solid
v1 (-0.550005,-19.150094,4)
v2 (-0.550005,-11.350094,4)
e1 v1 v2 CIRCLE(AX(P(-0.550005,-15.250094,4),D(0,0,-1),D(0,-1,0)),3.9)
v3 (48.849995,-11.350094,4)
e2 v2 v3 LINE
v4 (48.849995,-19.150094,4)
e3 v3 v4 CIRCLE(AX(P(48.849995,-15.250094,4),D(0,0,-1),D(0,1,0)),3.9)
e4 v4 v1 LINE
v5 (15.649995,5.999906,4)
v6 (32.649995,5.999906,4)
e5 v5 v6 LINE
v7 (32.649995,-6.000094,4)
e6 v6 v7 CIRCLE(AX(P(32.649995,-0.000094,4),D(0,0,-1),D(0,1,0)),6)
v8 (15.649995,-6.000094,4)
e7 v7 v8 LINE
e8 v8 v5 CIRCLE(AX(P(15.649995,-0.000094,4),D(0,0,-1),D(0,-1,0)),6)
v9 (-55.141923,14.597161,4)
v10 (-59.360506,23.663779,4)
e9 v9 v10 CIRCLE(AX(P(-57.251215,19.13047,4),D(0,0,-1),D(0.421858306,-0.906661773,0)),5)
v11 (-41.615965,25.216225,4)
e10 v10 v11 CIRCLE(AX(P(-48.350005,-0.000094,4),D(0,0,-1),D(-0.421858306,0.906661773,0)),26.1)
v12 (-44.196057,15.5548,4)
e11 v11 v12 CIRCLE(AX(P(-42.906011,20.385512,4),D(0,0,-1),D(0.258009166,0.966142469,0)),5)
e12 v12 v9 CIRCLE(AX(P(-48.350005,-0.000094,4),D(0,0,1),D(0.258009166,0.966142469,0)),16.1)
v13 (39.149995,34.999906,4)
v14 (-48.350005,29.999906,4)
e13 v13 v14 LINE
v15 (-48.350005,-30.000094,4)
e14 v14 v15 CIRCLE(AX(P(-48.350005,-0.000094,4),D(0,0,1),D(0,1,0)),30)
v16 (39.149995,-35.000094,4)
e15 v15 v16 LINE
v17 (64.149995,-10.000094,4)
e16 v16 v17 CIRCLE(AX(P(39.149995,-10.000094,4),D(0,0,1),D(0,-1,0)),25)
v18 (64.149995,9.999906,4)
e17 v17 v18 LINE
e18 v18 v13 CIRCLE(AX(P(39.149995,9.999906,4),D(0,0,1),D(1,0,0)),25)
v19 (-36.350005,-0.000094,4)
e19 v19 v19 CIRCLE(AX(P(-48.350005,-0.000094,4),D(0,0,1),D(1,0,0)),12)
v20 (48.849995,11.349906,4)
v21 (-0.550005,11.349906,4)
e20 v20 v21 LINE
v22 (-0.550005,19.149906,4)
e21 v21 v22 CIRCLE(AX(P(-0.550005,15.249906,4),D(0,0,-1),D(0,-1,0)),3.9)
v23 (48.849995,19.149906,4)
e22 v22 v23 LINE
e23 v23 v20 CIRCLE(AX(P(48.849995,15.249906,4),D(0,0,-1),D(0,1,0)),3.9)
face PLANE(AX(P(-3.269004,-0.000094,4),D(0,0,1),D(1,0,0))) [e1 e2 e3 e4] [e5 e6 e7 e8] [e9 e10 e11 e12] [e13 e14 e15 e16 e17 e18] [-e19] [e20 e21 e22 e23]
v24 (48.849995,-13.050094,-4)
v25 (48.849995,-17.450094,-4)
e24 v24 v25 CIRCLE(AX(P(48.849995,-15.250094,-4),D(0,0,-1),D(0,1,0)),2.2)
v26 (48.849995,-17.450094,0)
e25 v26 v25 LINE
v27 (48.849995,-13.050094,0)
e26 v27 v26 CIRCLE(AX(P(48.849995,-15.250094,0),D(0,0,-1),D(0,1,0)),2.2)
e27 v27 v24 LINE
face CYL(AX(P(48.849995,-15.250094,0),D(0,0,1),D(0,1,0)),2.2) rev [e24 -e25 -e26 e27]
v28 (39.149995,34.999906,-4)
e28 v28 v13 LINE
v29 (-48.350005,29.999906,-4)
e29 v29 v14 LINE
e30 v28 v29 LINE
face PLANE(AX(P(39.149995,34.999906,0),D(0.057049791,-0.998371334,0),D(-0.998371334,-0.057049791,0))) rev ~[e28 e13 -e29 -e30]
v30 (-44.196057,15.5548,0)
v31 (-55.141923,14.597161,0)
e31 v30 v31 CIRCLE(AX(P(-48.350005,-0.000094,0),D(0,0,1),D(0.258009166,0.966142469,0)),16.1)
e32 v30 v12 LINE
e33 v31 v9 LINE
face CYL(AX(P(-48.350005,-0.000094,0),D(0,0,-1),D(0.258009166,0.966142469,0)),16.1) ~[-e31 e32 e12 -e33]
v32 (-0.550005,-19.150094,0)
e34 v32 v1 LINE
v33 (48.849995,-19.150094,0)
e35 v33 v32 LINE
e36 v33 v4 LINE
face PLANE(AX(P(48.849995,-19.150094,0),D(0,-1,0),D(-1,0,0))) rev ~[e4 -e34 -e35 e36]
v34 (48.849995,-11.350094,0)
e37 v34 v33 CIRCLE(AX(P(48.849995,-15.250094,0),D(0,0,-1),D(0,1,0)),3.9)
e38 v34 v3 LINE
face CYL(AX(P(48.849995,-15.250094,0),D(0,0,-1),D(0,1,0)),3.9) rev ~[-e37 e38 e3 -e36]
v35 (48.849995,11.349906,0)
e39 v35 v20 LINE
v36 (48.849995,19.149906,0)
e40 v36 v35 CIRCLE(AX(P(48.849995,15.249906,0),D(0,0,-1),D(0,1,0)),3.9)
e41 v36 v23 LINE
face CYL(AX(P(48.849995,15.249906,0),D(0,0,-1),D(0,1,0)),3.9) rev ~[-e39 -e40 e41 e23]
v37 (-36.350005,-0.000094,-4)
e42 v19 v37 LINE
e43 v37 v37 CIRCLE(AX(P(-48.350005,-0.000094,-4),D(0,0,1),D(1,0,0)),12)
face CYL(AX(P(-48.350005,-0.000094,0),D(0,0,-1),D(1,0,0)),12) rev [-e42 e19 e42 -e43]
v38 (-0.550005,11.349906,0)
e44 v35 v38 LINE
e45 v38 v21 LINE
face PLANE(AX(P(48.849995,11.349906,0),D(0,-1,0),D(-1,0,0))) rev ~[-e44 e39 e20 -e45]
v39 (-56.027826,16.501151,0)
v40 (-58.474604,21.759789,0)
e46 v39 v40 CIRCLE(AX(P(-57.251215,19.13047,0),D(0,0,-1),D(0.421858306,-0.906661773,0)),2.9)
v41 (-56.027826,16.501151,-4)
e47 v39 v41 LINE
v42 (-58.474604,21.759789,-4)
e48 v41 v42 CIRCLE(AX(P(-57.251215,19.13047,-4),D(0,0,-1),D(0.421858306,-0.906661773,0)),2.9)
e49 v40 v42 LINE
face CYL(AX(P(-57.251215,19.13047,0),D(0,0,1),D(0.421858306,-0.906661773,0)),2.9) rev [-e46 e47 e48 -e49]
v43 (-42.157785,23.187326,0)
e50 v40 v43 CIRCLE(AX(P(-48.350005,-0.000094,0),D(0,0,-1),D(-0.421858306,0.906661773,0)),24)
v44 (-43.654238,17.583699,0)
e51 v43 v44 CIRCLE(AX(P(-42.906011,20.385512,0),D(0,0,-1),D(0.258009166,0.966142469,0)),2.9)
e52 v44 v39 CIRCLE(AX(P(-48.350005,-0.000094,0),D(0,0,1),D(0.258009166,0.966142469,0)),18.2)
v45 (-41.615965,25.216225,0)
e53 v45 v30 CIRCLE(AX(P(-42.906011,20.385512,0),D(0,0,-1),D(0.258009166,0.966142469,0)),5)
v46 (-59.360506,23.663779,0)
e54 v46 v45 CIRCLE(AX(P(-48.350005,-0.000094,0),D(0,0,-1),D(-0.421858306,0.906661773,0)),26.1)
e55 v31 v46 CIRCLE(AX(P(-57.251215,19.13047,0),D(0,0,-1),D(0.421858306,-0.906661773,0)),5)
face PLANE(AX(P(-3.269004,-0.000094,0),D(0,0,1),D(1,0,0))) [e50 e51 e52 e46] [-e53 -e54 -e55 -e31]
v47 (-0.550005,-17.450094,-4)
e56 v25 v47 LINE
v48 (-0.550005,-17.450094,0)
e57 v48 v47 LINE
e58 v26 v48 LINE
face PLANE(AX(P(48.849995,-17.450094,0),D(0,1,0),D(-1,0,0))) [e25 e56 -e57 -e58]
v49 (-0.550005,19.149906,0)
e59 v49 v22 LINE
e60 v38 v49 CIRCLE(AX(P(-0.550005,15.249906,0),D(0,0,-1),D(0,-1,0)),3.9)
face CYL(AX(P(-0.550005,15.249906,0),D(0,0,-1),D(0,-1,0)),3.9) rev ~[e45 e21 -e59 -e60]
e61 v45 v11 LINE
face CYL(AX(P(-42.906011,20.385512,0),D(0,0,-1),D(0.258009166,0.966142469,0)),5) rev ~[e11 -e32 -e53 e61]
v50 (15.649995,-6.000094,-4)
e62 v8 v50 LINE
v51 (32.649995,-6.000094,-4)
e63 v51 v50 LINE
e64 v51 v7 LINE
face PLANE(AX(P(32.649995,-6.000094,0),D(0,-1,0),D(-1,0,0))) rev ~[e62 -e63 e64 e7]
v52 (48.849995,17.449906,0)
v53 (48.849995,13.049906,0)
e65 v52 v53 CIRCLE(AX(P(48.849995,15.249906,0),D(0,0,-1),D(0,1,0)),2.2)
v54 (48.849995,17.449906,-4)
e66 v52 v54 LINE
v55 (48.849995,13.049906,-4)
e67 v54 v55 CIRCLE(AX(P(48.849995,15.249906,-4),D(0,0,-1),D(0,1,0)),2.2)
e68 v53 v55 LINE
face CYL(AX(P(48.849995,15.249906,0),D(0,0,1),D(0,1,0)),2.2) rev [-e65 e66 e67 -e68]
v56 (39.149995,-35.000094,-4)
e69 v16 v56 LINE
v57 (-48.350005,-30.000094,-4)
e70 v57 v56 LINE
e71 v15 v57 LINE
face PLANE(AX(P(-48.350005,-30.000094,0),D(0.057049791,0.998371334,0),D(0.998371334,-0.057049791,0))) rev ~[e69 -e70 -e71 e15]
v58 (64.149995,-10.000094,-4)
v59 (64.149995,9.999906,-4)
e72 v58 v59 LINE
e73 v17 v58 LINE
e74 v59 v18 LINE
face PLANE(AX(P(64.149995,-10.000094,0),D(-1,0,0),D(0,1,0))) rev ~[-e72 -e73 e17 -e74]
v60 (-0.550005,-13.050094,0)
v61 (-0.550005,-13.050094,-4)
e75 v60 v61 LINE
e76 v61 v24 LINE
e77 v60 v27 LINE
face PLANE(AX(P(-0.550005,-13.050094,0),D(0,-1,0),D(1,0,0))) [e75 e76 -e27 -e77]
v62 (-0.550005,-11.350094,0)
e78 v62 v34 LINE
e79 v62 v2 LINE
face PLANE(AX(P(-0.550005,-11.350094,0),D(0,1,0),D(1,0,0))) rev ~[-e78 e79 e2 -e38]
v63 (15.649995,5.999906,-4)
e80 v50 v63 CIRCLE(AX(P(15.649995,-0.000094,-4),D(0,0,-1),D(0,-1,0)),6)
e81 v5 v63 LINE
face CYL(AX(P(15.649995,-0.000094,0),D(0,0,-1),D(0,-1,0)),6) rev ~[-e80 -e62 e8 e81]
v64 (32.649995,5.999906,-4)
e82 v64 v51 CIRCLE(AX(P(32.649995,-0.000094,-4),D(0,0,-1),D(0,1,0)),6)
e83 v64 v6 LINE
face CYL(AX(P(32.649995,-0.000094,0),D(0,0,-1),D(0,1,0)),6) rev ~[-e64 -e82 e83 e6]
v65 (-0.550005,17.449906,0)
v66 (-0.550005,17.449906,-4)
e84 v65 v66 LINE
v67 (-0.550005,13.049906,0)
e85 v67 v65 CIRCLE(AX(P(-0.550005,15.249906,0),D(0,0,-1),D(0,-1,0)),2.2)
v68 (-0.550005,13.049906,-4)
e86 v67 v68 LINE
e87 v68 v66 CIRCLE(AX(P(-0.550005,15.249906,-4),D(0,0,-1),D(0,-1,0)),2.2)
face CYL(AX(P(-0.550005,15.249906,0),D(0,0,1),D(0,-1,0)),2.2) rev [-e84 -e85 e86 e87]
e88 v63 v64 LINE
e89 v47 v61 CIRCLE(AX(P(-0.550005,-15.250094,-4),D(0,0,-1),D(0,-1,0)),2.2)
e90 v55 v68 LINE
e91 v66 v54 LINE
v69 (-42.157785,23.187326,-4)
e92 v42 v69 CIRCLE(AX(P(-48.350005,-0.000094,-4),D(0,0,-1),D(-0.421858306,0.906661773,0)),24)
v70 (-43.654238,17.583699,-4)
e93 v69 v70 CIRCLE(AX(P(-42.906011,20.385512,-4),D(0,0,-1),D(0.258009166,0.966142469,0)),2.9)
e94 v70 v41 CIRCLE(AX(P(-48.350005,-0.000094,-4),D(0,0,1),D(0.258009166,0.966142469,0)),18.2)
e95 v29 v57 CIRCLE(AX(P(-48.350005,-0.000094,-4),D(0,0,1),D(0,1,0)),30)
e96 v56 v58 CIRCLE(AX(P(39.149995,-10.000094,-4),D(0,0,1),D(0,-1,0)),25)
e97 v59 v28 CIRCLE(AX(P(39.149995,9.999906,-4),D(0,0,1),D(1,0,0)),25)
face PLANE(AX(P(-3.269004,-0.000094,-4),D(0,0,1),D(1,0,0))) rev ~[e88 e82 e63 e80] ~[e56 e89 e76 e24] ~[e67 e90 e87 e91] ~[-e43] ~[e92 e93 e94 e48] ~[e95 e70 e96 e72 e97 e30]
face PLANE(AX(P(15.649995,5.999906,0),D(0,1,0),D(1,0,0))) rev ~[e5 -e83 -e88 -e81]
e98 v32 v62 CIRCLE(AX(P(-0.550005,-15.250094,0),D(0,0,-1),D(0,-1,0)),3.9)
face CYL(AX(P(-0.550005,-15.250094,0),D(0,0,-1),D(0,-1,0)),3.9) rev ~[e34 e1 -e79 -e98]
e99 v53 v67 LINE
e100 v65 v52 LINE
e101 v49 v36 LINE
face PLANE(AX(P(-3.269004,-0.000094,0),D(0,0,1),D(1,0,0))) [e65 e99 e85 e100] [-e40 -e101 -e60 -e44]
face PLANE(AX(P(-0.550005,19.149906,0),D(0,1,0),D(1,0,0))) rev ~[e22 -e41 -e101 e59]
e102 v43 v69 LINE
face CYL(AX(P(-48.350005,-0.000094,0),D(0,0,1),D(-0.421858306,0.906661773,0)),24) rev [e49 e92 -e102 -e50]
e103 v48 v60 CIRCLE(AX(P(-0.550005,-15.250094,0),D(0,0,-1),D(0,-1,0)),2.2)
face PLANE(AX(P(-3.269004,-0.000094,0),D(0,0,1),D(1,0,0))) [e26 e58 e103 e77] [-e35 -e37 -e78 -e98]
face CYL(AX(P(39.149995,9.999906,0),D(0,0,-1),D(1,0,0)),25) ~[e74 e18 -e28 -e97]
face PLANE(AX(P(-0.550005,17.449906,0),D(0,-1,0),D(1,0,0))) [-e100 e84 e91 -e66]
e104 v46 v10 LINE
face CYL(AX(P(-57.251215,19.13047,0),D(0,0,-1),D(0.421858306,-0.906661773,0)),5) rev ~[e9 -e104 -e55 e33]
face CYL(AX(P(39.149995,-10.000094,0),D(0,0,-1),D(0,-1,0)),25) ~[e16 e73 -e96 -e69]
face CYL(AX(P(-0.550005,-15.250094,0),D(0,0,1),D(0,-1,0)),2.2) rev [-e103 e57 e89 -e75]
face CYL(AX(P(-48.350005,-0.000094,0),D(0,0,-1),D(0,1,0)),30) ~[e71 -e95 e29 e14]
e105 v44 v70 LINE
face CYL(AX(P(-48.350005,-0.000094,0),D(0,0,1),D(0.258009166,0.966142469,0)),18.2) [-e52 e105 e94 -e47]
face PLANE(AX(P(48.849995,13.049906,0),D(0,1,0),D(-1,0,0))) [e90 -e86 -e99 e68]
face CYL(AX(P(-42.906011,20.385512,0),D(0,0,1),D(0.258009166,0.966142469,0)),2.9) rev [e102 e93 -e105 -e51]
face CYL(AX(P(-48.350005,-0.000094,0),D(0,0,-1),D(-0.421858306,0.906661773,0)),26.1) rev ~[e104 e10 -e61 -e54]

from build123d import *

# Parameters (mm, degrees)
F0_R     = 12
F1_DEPTH = 4
F2_DEPTH = 4


# Not quite as in the source:
# - a feature names something its author has since deleted; it is built from what else it names


with BuildPart() as f1:
    # F0 (on Top) → F1 (new body)
    with BuildSketch(Plane.XY):
        with BuildLine():
            Line((64.1499952853, -10.0000936452), (64.1499952853, 9.9999063548))
            ThreePointArc((64.1499952853, 9.9999063548), (56.8276648149, 27.6775758844), (39.1499952853, 34.9999063548))
            Line((39.1499952853, 34.9999063548), (-48.3500047147, 29.9999063548))
            ThreePointArc((-48.3500047147, 29.9999063548), (-78.3500047147, -9.36452e-05), (-48.3500047147, -30.0000936452))
            Line((-48.3500047147, -30.0000936452), (39.1499952853, -35.0000936452))
            ThreePointArc((39.1499952853, -35.0000936452), (56.8276648149, -27.6777631749), (64.1499952853, -10.0000936452))
        make_face()
        with BuildLine():
            ThreePointArc((-0.5500047147, -19.1500936452), (-4.4500047147, -15.2500936452), (-0.5500047147, -11.3500936452))
            Line((-0.5500047147, -11.3500936452), (24.1499952853, -11.3500936452))
            Line((24.1499952853, -11.3500936452), (48.8499952853, -11.3500936452))
            ThreePointArc((48.8499952853, -11.3500936452), (52.7499952853, -15.2500936452), (48.8499952853, -19.1500936452))
            Line((48.8499952853, -19.1500936452), (24.1499952853, -19.1500936452))
            Line((24.1499952853, -19.1500936452), (-0.5500047147, -19.1500936452))
        make_face(mode=Mode.SUBTRACT)
        with Locations((-48.3500047147, -9.36452e-05)):
            Circle(F0_R, mode=Mode.SUBTRACT)
        with BuildLine():
            ThreePointArc((-55.1419234399, 14.5971608922), (-61.784523832, 17.0211782252), (-59.3605064989, 23.6637786173))
            ThreePointArc((-59.3605064989, 23.6637786173), (-50.6247696004, 26.0005879749), (-41.615965488, 25.2162247953))
            ThreePointArc((-41.615965488, 25.2162247953), (-38.075298972, 19.0954666215), (-44.1960571458, 15.5548001054))
            ThreePointArc((-44.1960571458, 15.5548001054), (-49.753212173, 16.038640994), (-55.1419234399, 14.5971608922))
        make_face(mode=Mode.SUBTRACT)
        with BuildLine():
            Line((24.1499952853, 5.9999063548), (32.6499952853, 5.9999063548))
            ThreePointArc((32.6499952853, 5.9999063548), (38.6499952853, -9.36452e-05), (32.6499952853, -6.0000936452))
            Line((32.6499952853, -6.0000936452), (24.1499952853, -6.0000936452))
            Line((24.1499952853, -6.0000936452), (15.6499952853, -6.0000936452))
            ThreePointArc((15.6499952853, -6.0000936452), (9.6499952853, -9.36452e-05), (15.6499952853, 5.9999063548))
            Line((15.6499952853, 5.9999063548), (24.1499952853, 5.9999063548))
        make_face(mode=Mode.SUBTRACT)
        with BuildLine():
            Line((24.1499952853, 11.3499063548), (-0.5500047147, 11.3499063548))
            ThreePointArc((-0.5500047147, 11.3499063548), (-4.4500047147, 15.2499063548), (-0.5500047147, 19.1499063548))
            Line((-0.5500047147, 19.1499063548), (24.1499952853, 19.1499063548))
            Line((24.1499952853, 19.1499063548), (48.8499952853, 19.1499063548))
            ThreePointArc((48.8499952853, 19.1499063548), (52.7499952853, 15.2499063548), (48.8499952853, 11.3499063548))
            Line((48.8499952853, 11.3499063548), (24.1499952853, 11.3499063548))
        make_face(mode=Mode.SUBTRACT)
        with BuildLine():
            ThreePointArc((-41.615965488, 25.2162247953), (-50.6247696004, 26.0005879749), (-59.3605064989, 23.6637786173))
            ThreePointArc((-59.3605064989, 23.6637786173), (-61.784523832, 17.0211782252), (-55.1419234399, 14.5971608922))
            ThreePointArc((-55.1419234399, 14.5971608922), (-49.753212173, 16.038640994), (-44.1960571458, 15.5548001054))
            ThreePointArc((-44.1960571458, 15.5548001054), (-38.075298972, 19.0954666215), (-41.615965488, 25.2162247953))
        make_face()
        with BuildLine():
            ThreePointArc((-56.0278258823, 16.5011506145), (-59.8805341097, 17.9070806676), (-58.4746040565, 21.7597888951))
            ThreePointArc((-58.4746040565, 21.7597888951), (-50.4417425407, 23.908579109), (-42.1577847361, 23.1873256104))
            ThreePointArc((-42.1577847361, 23.1873256104), (-40.1041981568, 19.6372858696), (-43.6542378976, 17.5836992903))
            ThreePointArc((-43.6542378976, 17.5836992903), (-49.9362392327, 18.13064986), (-56.0278258823, 16.5011506145))
        make_face(mode=Mode.SUBTRACT)
        with BuildLine():
            ThreePointArc((-0.5500047147, 19.1499063548), (-4.4500047147, 15.2499063548), (-0.5500047147, 11.3499063548))
            Line((-0.5500047147, 11.3499063548), (24.1499952853, 11.3499063548))
            Line((24.1499952853, 11.3499063548), (48.8499952853, 11.3499063548))
            ThreePointArc((48.8499952853, 11.3499063548), (52.7499952853, 15.2499063548), (48.8499952853, 19.1499063548))
            Line((48.8499952853, 19.1499063548), (24.1499952853, 19.1499063548))
            Line((24.1499952853, 19.1499063548), (-0.5500047147, 19.1499063548))
        make_face()
        with BuildLine():
            Line((24.1499952853, 13.0499063548), (-0.5500047147, 13.0499063548))
            ThreePointArc((-0.5500047147, 13.0499063548), (-2.7500047147, 15.2499063548), (-0.5500047147, 17.4499063548))
            Line((-0.5500047147, 17.4499063548), (24.1499952853, 17.4499063548))
            Line((24.1499952853, 17.4499063548), (48.8499952853, 17.4499063548))
            ThreePointArc((48.8499952853, 17.4499063548), (51.0499952853, 15.2499063548), (48.8499952853, 13.0499063548))
            Line((48.8499952853, 13.0499063548), (24.1499952853, 13.0499063548))
        make_face(mode=Mode.SUBTRACT)
        with BuildLine():
            Line((24.1499952853, -11.3500936452), (-0.5500047147, -11.3500936452))
            ThreePointArc((-0.5500047147, -11.3500936452), (-4.4500047147, -15.2500936452), (-0.5500047147, -19.1500936452))
            Line((-0.5500047147, -19.1500936452), (24.1499952853, -19.1500936452))
            Line((24.1499952853, -19.1500936452), (48.8499952853, -19.1500936452))
            ThreePointArc((48.8499952853, -19.1500936452), (52.7499952853, -15.2500936452), (48.8499952853, -11.3500936452))
            Line((48.8499952853, -11.3500936452), (24.1499952853, -11.3500936452))
        make_face()
        with BuildLine():
            ThreePointArc((-0.5500047147, -17.4500936452), (-2.7500047147, -15.2500936452), (-0.5500047147, -13.0500936452))
            Line((-0.5500047147, -13.0500936452), (24.1499952853, -13.0500936452))
            Line((24.1499952853, -13.0500936452), (48.8499952853, -13.0500936452))
            ThreePointArc((48.8499952853, -13.0500936452), (51.0499952853, -15.2500936452), (48.8499952853, -17.4500936452))
            Line((48.8499952853, -17.4500936452), (24.1499952853, -17.4500936452))
            Line((24.1499952853, -17.4500936452), (-0.5500047147, -17.4500936452))
        make_face(mode=Mode.SUBTRACT)
    extrude(amount=-F1_DEPTH)

    # F0 (on Top) → F2 (join)
    with BuildSketch(Plane.XY):
        with BuildLine():
            Line((64.1499952853, -10.0000936452), (64.1499952853, 9.9999063548))
            ThreePointArc((64.1499952853, 9.9999063548), (56.8276648149, 27.6775758844), (39.1499952853, 34.9999063548))
            Line((39.1499952853, 34.9999063548), (-48.3500047147, 29.9999063548))
            ThreePointArc((-48.3500047147, 29.9999063548), (-78.3500047147, -9.36452e-05), (-48.3500047147, -30.0000936452))
            Line((-48.3500047147, -30.0000936452), (39.1499952853, -35.0000936452))
            ThreePointArc((39.1499952853, -35.0000936452), (56.8276648149, -27.6777631749), (64.1499952853, -10.0000936452))
        make_face()
        with BuildLine():
            ThreePointArc((-0.5500047147, -19.1500936452), (-4.4500047147, -15.2500936452), (-0.5500047147, -11.3500936452))
            Line((-0.5500047147, -11.3500936452), (24.1499952853, -11.3500936452))
            Line((24.1499952853, -11.3500936452), (48.8499952853, -11.3500936452))
            ThreePointArc((48.8499952853, -11.3500936452), (52.7499952853, -15.2500936452), (48.8499952853, -19.1500936452))
            Line((48.8499952853, -19.1500936452), (24.1499952853, -19.1500936452))
            Line((24.1499952853, -19.1500936452), (-0.5500047147, -19.1500936452))
        make_face(mode=Mode.SUBTRACT)
        with Locations((-48.3500047147, -9.36452e-05)):
            Circle(F0_R, mode=Mode.SUBTRACT)
        with BuildLine():
            ThreePointArc((-55.1419234399, 14.5971608922), (-61.784523832, 17.0211782252), (-59.3605064989, 23.6637786173))
            ThreePointArc((-59.3605064989, 23.6637786173), (-50.6247696004, 26.0005879749), (-41.615965488, 25.2162247953))
            ThreePointArc((-41.615965488, 25.2162247953), (-38.075298972, 19.0954666215), (-44.1960571458, 15.5548001054))
            ThreePointArc((-44.1960571458, 15.5548001054), (-49.753212173, 16.038640994), (-55.1419234399, 14.5971608922))
        make_face(mode=Mode.SUBTRACT)
        with BuildLine():
            Line((24.1499952853, 5.9999063548), (32.6499952853, 5.9999063548))
            ThreePointArc((32.6499952853, 5.9999063548), (38.6499952853, -9.36452e-05), (32.6499952853, -6.0000936452))
            Line((32.6499952853, -6.0000936452), (24.1499952853, -6.0000936452))
            Line((24.1499952853, -6.0000936452), (15.6499952853, -6.0000936452))
            ThreePointArc((15.6499952853, -6.0000936452), (9.6499952853, -9.36452e-05), (15.6499952853, 5.9999063548))
            Line((15.6499952853, 5.9999063548), (24.1499952853, 5.9999063548))
        make_face(mode=Mode.SUBTRACT)
        with BuildLine():
            Line((24.1499952853, 11.3499063548), (-0.5500047147, 11.3499063548))
            ThreePointArc((-0.5500047147, 11.3499063548), (-4.4500047147, 15.2499063548), (-0.5500047147, 19.1499063548))
            Line((-0.5500047147, 19.1499063548), (24.1499952853, 19.1499063548))
            Line((24.1499952853, 19.1499063548), (48.8499952853, 19.1499063548))
            ThreePointArc((48.8499952853, 19.1499063548), (52.7499952853, 15.2499063548), (48.8499952853, 11.3499063548))
            Line((48.8499952853, 11.3499063548), (24.1499952853, 11.3499063548))
        make_face(mode=Mode.SUBTRACT)
    extrude(amount=F2_DEPTH)


solid = f1.part
